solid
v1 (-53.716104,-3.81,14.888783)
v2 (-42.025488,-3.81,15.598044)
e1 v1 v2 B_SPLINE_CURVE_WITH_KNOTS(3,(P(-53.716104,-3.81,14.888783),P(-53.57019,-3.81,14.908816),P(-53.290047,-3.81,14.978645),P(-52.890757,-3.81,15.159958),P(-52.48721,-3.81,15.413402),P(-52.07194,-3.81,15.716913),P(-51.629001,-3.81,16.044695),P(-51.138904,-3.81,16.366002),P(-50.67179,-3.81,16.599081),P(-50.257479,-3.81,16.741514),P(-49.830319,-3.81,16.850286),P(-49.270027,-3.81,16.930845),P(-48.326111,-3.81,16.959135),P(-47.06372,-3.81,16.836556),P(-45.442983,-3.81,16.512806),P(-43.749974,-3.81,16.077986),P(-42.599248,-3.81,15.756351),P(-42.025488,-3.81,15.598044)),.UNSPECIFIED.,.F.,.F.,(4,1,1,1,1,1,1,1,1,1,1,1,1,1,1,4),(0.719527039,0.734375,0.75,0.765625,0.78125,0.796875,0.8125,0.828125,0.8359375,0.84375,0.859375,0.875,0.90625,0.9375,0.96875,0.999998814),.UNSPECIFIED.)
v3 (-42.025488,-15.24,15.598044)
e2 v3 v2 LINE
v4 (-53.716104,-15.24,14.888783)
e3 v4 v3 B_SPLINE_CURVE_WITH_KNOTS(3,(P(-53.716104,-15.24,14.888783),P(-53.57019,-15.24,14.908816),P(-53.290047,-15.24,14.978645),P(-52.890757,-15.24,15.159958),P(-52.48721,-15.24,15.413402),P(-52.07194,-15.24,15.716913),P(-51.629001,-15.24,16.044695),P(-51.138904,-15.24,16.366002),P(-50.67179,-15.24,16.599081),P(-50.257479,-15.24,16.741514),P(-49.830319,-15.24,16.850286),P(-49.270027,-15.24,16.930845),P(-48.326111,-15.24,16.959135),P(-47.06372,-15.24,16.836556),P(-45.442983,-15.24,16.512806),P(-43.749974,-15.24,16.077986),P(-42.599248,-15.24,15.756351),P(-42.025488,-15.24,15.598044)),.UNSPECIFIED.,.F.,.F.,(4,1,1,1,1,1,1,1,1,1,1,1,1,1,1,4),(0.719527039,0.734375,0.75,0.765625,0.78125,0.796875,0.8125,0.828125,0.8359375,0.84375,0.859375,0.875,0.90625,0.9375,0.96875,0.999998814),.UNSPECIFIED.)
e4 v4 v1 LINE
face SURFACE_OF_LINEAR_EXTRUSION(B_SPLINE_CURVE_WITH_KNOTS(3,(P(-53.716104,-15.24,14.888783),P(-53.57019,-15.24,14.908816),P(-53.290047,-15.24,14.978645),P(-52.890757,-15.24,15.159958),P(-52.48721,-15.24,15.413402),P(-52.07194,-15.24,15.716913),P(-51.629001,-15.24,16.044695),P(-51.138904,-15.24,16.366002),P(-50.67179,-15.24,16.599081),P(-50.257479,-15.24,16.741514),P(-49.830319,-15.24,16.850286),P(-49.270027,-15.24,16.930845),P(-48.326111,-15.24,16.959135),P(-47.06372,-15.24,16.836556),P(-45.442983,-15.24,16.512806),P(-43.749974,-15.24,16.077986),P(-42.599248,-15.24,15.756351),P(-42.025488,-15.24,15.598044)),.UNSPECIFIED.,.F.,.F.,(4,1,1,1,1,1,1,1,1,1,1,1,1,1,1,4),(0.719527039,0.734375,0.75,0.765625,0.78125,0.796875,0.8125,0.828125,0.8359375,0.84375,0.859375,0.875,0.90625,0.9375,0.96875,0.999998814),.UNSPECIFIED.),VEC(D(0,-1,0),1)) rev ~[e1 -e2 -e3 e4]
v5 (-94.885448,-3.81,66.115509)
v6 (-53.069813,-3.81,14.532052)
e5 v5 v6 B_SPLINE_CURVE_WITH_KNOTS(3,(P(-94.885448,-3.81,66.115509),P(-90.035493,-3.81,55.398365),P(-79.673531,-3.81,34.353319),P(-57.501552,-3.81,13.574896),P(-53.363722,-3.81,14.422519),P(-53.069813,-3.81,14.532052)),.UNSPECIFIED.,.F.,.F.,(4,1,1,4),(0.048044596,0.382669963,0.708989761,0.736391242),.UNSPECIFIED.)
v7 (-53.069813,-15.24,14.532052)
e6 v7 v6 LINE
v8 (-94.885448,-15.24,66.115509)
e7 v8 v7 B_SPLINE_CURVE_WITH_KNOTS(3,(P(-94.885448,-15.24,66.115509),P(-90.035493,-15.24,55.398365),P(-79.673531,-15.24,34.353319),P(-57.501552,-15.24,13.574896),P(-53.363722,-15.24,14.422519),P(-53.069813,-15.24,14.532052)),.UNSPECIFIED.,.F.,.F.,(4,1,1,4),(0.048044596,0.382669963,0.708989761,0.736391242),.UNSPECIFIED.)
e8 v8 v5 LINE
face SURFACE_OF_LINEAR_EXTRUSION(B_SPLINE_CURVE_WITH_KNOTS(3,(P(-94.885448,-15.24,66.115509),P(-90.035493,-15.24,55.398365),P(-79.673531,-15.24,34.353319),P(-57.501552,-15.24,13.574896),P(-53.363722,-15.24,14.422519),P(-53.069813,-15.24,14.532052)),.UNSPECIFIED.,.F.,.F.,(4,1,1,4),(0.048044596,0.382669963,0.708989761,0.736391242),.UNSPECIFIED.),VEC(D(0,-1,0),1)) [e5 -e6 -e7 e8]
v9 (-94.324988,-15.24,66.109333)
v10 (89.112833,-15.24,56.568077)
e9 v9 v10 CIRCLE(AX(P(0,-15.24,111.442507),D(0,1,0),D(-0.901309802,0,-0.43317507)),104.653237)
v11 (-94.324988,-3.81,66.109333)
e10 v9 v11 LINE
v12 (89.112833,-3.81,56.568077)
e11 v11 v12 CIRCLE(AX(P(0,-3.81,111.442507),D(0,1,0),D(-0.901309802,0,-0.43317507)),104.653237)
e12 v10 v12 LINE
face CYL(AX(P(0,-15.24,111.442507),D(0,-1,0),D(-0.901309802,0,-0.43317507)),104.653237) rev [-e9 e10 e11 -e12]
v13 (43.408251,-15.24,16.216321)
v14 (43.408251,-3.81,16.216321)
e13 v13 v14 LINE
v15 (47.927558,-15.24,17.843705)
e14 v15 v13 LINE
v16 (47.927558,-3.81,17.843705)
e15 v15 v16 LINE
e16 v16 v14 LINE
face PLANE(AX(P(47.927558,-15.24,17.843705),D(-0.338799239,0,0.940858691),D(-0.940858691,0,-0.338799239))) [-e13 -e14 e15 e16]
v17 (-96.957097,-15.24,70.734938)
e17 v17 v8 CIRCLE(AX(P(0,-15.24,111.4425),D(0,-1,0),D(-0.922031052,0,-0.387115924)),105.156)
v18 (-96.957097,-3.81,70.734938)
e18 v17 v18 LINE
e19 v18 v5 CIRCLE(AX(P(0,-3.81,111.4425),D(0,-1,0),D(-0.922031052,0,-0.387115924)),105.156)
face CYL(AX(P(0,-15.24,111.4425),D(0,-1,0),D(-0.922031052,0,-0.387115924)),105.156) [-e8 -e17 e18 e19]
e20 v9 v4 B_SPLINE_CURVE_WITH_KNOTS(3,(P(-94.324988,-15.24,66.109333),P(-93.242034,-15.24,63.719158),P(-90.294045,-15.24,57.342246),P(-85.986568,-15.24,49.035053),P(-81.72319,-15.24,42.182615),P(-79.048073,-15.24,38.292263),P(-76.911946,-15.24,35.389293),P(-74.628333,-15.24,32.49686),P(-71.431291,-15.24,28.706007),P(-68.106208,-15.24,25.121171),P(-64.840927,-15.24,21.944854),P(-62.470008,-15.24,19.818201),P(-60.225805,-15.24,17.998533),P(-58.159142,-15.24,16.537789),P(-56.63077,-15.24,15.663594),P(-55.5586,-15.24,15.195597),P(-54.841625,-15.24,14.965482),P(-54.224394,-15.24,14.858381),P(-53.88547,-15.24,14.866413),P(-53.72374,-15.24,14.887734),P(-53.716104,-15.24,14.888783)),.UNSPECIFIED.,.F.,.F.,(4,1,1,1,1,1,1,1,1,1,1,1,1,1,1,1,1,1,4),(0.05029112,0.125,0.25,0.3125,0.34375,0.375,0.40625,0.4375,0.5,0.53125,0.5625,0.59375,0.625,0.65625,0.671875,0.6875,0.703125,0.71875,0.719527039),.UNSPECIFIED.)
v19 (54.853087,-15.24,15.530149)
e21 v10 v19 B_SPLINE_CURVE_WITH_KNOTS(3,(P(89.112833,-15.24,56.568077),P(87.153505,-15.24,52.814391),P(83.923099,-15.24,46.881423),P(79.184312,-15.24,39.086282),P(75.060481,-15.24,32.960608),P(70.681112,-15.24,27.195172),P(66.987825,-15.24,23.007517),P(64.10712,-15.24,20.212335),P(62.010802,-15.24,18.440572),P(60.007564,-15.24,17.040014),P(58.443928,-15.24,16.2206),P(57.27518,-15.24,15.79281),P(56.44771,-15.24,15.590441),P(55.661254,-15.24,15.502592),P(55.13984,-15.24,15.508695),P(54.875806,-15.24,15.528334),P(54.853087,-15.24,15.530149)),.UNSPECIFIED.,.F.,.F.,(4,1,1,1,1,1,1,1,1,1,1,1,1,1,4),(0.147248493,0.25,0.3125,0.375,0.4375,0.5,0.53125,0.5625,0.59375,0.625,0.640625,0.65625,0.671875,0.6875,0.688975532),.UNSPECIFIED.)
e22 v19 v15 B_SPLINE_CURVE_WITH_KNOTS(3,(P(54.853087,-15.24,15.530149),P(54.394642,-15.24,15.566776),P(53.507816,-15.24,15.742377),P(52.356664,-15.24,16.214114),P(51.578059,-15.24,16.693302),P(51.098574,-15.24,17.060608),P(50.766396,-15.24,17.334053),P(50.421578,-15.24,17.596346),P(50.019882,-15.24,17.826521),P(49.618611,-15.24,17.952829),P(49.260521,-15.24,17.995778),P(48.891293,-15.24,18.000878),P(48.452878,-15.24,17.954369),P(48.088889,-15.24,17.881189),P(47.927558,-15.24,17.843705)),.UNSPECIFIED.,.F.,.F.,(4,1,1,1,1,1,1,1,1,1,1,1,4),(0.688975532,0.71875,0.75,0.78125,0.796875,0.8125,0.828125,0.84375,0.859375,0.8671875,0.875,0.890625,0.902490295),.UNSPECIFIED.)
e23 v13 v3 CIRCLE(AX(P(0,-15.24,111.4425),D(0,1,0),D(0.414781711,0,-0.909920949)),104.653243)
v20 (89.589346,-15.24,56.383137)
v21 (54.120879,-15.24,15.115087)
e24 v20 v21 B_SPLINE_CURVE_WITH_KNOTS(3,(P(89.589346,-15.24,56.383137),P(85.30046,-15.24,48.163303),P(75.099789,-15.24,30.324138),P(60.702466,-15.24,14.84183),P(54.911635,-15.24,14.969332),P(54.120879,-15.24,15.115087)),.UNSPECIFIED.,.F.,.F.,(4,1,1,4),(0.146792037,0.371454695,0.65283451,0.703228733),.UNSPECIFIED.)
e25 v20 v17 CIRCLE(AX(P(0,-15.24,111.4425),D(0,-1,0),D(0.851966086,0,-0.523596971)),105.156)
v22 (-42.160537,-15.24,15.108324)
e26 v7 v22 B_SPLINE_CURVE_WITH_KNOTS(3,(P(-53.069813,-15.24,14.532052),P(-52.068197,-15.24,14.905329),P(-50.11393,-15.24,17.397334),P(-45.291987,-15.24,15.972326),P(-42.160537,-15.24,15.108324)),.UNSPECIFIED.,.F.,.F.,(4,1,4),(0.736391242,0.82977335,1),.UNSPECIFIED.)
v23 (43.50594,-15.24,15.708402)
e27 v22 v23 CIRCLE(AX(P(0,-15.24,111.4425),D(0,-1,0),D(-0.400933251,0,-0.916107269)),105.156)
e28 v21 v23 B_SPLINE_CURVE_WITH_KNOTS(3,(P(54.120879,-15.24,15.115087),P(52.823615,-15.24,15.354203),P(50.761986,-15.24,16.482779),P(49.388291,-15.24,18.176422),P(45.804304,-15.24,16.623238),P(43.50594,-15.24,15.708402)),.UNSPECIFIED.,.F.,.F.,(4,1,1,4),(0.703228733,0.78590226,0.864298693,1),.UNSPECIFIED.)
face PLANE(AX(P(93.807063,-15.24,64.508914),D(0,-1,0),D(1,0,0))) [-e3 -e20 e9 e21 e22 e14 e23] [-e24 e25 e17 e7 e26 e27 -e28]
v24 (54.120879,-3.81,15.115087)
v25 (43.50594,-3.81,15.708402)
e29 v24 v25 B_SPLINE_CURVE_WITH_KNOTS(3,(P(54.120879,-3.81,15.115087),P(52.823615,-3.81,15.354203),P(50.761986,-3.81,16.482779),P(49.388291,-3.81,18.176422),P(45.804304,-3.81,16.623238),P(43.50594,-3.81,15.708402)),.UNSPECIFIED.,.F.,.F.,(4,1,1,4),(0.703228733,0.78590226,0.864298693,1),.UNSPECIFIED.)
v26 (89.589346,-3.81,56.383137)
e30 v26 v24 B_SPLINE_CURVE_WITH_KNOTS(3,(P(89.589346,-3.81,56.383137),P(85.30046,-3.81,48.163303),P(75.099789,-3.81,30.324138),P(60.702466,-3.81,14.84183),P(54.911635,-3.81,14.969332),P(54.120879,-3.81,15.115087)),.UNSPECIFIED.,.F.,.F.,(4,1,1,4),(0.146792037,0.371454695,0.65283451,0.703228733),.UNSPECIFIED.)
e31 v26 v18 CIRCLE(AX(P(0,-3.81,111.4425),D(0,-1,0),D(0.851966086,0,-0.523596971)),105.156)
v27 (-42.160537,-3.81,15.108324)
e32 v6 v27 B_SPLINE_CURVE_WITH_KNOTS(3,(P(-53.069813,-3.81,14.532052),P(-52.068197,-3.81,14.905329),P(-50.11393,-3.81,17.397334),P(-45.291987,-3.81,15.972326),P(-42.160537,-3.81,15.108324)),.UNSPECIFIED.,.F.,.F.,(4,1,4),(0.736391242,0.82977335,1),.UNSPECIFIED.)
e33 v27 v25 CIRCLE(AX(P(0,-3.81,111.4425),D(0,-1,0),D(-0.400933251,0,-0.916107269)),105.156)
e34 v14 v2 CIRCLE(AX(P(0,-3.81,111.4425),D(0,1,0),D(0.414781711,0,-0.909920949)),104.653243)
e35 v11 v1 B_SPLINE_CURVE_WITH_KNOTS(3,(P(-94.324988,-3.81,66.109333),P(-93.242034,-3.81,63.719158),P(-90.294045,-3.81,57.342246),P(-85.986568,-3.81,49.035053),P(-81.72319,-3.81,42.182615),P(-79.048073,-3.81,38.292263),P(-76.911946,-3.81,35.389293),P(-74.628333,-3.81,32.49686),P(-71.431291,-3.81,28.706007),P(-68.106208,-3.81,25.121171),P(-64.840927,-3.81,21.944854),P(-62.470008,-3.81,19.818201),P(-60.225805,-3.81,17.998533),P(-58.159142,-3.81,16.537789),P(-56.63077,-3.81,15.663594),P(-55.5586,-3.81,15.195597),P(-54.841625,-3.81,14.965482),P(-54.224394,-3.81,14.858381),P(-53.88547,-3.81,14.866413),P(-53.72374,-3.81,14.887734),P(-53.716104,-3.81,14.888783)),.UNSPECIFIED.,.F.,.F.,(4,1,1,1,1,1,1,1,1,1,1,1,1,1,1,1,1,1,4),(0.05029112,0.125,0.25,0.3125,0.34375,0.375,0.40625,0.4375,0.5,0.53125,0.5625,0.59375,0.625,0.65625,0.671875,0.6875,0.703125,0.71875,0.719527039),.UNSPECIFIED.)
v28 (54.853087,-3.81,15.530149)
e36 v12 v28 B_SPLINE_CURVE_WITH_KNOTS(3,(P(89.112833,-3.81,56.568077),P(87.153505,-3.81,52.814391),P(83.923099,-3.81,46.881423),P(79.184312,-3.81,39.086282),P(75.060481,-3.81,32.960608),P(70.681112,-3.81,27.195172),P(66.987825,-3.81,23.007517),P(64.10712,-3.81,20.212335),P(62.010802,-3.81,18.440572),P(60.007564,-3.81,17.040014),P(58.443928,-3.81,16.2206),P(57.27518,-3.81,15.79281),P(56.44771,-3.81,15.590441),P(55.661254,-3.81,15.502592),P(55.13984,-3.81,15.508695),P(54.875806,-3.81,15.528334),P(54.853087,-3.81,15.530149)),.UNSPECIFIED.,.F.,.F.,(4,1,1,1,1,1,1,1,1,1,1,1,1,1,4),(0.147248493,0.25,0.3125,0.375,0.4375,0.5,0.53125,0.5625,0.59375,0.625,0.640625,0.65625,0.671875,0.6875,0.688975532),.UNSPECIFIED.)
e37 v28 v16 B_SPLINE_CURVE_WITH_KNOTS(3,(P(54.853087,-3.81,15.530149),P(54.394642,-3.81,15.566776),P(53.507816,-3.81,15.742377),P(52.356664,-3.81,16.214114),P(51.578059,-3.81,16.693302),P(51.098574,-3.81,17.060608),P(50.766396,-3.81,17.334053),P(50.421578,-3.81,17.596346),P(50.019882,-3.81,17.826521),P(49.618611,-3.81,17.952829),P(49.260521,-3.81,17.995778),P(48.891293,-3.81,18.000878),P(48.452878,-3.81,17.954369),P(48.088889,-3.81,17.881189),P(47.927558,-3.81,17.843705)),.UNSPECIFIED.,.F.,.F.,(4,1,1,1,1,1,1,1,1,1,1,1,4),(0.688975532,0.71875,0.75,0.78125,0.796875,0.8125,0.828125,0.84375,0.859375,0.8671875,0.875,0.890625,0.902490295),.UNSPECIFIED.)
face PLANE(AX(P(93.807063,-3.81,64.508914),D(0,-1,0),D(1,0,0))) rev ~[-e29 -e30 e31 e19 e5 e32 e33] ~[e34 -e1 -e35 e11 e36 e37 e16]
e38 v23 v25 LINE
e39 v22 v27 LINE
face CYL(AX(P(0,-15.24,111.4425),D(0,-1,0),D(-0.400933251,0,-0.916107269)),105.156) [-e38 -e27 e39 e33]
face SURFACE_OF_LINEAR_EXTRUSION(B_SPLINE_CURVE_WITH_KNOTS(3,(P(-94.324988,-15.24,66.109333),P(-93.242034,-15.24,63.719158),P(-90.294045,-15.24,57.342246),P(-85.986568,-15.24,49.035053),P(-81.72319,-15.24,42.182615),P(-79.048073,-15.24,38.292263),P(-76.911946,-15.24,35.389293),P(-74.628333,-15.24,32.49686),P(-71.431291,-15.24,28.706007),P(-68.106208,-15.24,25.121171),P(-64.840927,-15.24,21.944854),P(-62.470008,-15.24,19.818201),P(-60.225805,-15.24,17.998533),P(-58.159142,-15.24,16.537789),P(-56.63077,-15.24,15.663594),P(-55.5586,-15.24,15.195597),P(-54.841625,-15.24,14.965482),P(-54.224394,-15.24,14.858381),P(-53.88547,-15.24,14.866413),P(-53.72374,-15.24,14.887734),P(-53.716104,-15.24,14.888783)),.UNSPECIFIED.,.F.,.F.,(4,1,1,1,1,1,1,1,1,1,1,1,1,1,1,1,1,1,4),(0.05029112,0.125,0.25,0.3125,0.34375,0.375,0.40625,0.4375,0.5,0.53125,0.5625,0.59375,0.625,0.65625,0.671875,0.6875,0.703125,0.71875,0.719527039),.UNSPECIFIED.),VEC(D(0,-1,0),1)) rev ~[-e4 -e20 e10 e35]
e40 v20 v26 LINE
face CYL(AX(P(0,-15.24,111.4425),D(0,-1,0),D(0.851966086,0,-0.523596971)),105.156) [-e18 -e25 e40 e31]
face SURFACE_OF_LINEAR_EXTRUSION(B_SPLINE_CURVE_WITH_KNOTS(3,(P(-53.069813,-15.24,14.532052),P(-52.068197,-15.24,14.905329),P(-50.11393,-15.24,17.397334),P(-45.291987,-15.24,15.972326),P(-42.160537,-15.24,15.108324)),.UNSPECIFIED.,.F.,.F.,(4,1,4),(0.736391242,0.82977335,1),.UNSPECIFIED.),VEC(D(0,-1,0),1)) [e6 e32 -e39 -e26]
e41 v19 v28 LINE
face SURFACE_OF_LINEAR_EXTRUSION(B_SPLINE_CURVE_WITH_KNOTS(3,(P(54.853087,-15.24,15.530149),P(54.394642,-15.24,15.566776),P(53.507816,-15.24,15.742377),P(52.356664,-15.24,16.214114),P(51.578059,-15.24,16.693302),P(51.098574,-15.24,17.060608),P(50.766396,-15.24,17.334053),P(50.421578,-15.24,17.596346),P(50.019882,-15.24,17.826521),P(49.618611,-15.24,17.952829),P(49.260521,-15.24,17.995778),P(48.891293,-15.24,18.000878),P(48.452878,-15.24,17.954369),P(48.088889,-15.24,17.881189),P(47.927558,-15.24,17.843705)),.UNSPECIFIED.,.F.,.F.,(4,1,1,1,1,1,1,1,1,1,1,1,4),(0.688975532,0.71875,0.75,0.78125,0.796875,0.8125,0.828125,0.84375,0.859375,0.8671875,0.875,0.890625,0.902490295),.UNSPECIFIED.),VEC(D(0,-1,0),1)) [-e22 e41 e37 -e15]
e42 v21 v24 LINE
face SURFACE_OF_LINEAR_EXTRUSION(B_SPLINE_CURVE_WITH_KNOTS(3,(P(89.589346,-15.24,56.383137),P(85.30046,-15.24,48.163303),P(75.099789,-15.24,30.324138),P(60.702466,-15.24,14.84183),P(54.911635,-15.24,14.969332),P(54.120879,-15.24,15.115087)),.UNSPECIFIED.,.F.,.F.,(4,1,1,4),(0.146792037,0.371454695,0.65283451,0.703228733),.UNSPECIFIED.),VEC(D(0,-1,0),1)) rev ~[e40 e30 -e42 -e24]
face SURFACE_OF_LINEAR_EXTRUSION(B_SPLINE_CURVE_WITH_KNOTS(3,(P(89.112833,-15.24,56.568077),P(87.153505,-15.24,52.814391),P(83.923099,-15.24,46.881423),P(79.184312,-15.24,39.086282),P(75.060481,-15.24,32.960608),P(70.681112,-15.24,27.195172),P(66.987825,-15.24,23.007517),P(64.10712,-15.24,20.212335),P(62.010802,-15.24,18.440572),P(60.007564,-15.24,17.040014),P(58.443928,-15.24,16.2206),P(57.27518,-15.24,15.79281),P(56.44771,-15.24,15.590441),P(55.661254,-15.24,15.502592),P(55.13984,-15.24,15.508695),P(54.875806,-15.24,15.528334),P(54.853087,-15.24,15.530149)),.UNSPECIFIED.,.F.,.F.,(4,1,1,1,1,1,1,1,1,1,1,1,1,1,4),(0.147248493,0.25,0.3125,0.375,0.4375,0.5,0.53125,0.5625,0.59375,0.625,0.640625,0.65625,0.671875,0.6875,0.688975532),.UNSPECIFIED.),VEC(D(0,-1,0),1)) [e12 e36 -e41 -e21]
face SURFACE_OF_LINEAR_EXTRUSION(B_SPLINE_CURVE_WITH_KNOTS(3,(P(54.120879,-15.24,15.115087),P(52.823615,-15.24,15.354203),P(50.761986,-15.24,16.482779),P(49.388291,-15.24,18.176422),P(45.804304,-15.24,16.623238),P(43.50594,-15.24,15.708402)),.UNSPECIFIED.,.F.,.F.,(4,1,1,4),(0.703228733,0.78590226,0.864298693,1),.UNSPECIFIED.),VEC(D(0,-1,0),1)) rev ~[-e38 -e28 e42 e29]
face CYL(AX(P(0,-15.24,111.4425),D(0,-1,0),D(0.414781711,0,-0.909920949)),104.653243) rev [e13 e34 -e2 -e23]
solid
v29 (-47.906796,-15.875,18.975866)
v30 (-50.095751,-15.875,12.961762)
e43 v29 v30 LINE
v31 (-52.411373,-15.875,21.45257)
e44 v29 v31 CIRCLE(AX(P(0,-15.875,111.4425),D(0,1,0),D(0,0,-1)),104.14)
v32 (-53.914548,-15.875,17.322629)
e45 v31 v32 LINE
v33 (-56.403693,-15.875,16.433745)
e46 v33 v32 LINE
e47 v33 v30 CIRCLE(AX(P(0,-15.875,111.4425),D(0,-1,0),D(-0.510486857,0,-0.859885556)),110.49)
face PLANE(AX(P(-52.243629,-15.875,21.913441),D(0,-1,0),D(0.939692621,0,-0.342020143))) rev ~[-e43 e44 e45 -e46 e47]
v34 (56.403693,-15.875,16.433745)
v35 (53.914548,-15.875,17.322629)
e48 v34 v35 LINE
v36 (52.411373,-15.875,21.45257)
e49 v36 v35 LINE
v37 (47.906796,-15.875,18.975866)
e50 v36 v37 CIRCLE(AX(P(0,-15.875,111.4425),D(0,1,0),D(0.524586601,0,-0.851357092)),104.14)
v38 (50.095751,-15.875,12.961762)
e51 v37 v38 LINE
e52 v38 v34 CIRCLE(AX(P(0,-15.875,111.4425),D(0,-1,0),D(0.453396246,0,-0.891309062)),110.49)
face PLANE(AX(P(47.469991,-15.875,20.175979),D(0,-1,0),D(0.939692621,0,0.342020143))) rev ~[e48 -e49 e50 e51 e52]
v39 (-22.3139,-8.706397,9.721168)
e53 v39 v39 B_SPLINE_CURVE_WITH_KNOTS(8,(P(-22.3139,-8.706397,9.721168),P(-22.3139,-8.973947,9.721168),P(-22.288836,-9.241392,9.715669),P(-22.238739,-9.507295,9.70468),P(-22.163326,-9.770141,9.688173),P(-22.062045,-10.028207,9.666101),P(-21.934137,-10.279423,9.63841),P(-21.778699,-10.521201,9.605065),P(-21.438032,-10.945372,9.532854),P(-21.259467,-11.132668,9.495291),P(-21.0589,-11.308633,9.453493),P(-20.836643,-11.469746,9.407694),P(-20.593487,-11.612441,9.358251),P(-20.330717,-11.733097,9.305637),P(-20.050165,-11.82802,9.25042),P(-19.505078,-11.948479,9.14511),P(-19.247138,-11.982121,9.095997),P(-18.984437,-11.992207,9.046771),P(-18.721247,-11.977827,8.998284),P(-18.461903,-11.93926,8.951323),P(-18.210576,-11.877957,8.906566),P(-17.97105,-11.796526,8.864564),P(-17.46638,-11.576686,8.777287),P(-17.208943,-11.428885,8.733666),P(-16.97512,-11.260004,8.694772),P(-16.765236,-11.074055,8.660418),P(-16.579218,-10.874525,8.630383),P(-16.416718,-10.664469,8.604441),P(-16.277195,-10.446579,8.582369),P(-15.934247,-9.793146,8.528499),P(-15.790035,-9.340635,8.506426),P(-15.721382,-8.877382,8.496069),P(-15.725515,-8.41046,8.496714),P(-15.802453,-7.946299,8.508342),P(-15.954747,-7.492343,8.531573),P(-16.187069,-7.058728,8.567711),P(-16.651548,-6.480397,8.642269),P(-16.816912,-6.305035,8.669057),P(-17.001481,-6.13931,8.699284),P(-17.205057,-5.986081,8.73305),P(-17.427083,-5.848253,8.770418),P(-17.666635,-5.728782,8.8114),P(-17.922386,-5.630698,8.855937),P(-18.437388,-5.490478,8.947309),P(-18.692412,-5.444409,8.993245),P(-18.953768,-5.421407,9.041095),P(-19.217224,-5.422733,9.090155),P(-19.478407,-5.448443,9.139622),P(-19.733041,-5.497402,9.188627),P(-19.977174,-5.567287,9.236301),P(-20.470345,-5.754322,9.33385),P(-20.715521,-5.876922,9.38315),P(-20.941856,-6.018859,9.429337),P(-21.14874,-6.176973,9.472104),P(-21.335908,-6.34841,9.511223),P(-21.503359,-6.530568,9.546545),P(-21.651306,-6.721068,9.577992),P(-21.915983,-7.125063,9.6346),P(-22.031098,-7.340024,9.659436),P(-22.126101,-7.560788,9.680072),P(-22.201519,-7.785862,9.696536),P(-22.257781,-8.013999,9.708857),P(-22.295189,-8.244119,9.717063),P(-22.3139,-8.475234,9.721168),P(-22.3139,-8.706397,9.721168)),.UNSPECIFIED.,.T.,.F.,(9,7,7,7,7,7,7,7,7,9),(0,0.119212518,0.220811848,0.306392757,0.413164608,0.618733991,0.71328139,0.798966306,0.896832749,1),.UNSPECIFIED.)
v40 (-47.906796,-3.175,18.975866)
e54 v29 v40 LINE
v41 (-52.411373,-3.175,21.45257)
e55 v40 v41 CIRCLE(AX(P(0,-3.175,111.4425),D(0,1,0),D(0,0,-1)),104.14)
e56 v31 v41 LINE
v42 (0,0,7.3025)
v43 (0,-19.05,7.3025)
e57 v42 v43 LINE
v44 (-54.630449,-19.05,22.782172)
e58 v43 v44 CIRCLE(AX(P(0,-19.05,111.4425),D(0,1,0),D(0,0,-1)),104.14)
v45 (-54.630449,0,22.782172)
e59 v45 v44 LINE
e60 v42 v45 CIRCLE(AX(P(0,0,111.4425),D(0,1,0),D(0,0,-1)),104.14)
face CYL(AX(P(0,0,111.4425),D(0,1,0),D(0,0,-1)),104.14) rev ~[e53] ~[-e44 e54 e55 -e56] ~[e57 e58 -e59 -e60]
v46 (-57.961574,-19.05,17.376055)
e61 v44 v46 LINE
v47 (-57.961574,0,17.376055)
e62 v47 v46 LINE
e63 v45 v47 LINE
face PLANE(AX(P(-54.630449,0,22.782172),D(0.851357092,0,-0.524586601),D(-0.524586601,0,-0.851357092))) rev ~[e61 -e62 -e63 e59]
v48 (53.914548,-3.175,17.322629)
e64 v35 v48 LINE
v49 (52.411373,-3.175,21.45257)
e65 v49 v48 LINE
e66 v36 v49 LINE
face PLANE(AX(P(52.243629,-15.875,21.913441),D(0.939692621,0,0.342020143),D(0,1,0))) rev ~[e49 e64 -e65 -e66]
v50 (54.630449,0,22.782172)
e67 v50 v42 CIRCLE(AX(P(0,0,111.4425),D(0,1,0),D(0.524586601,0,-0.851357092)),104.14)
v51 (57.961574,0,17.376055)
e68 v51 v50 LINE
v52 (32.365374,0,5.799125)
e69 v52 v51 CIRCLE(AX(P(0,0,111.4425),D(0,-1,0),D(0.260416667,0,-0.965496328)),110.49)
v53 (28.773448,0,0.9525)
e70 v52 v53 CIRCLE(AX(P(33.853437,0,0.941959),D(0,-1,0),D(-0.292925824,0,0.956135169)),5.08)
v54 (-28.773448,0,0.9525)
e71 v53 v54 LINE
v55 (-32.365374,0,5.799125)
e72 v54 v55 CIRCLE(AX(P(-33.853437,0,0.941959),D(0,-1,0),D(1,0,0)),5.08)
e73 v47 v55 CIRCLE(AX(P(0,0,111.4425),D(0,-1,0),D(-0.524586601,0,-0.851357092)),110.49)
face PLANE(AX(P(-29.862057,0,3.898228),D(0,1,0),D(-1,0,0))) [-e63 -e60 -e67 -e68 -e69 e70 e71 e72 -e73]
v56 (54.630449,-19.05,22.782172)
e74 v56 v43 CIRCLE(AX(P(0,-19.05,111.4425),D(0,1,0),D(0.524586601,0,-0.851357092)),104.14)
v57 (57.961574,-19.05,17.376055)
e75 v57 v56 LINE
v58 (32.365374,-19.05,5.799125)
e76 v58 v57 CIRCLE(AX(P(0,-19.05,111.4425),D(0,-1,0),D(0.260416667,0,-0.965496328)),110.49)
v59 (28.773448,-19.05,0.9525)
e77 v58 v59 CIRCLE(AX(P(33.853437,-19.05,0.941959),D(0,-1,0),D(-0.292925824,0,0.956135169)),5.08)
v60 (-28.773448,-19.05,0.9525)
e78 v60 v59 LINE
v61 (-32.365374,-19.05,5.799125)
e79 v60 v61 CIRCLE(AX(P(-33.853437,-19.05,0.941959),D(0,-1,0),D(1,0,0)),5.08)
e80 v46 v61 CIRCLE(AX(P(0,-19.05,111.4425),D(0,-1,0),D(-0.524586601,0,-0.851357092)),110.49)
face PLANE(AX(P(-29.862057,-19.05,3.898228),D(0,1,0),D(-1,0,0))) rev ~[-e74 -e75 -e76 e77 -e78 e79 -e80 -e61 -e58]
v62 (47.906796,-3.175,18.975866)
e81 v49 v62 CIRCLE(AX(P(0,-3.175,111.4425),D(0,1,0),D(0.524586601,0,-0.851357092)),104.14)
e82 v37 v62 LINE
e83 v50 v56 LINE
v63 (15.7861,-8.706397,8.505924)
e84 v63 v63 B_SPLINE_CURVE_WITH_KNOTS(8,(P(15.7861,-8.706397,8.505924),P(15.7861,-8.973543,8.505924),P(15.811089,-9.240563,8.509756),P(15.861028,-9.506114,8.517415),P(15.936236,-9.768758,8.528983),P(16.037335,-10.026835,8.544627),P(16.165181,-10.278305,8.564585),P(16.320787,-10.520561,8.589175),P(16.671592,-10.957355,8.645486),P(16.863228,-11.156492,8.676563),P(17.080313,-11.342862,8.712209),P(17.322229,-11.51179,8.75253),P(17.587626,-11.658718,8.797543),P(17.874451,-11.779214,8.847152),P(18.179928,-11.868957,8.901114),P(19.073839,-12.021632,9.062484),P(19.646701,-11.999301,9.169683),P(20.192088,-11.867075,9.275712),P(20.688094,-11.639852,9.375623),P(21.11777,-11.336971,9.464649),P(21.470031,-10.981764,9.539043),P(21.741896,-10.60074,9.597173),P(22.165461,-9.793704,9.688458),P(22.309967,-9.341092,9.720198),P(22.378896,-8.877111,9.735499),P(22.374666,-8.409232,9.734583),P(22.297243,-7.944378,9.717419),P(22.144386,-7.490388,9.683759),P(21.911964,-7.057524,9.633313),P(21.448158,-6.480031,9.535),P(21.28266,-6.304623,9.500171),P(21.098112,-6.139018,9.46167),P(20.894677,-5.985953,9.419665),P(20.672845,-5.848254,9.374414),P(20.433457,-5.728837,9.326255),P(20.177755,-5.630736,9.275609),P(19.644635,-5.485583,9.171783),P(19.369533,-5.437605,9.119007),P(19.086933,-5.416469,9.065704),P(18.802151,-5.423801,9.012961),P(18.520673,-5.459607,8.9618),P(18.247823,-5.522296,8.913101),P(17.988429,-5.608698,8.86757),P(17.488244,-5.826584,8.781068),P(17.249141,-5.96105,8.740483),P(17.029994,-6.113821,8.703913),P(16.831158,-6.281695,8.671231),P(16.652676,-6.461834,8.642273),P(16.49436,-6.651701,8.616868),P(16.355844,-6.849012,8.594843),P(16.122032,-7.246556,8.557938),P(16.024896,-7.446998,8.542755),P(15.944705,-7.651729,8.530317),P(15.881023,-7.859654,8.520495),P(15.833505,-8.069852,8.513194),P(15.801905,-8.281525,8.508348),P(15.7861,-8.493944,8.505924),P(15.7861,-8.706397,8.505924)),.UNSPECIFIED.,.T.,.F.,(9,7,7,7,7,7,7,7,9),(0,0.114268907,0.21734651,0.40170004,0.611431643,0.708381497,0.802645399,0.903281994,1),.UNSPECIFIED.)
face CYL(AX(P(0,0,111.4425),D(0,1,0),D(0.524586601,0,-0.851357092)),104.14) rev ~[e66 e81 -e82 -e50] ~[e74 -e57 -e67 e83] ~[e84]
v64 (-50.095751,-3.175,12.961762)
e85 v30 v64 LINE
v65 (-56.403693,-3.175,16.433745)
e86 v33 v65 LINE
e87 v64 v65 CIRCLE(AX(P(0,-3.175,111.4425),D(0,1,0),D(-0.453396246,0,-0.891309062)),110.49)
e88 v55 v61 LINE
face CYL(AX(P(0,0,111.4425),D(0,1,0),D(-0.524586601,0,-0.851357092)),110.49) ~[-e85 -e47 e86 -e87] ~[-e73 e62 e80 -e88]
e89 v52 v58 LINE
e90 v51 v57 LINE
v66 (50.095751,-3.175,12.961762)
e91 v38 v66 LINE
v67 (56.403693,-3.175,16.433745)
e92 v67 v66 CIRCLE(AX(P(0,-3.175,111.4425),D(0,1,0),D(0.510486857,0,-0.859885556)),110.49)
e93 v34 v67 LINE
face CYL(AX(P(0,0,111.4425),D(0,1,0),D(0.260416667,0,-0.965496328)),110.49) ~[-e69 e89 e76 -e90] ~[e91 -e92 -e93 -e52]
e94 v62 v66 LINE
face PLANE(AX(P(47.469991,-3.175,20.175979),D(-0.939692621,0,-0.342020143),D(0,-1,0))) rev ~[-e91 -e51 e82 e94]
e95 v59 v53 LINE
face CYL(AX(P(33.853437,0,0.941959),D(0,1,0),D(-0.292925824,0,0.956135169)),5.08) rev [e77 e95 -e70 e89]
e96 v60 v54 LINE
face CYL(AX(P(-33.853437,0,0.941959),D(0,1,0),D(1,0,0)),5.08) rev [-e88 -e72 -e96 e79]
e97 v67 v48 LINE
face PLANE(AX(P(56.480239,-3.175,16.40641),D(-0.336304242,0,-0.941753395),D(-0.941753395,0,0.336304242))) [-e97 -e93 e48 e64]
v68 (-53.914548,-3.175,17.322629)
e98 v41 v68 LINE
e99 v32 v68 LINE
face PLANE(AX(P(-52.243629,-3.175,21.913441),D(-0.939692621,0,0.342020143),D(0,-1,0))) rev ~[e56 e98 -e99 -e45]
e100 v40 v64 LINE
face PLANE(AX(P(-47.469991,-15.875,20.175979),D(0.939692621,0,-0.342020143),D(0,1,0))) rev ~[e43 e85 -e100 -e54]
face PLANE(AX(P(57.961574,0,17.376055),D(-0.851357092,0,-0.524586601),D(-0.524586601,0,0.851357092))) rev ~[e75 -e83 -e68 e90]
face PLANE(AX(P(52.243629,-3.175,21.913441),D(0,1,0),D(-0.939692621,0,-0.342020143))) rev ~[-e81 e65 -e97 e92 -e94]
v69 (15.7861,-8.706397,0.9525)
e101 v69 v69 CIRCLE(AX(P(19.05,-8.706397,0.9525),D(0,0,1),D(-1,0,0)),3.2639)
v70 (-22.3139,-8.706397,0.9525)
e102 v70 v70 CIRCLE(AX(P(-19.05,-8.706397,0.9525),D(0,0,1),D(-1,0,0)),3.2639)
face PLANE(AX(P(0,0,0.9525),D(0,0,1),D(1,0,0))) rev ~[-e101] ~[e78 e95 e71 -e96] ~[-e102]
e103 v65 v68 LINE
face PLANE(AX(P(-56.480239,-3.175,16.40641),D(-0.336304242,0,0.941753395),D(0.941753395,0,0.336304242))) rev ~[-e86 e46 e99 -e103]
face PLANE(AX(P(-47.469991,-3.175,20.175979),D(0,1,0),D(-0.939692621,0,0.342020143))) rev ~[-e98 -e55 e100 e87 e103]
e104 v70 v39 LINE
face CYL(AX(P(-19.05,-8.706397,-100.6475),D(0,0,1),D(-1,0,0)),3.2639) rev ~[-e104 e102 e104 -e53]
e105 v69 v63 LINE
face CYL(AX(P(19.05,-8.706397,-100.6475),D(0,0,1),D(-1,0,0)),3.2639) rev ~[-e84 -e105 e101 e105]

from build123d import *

# Parameters (mm, degrees)
F1_DEPTH     = 19.05
F3_D         = 6.5278
F3_DEPTH     = 101.6
F3_TIP       = 1.9611489744
F7_DEPTH     = 25.4
F9_DEPTH     = 25.4
F10_T1_DEPTH = 12.7
F11_T4_DEPTH = 19.05
F11_T9_DEPTH = 19.05
F13_START    = -3.81
F13_DEPTH    = 11.43


# Not quite as in the source:
# - a fillet or chamfer that OpenCascade refuses, or shapes differently, is made with other operations: its cross-section is extruded or revolved along the edge and cut away or added
# - ends of sketch curves that miss each other by under 0.0002 mm in the source are joined
# - the dataset's text gives a spline's control points without its knots; the knots are read off the source's solid


with BuildPart() as f1:
    # F0 (on Front) → F1 (new body)
    with BuildSketch(Plane.XZ):
        with BuildLine():
            Line((0, 0.9525), (28.7734375, 0.9525))
            Line((28.7734375, 0.9525), (28.7734375, 4.7648106998))
            ThreePointArc((28.7734375, 4.7648106998), (43.8235256978, 10.0149953703), (57.9615735284, 17.3760548981))
            Line((57.9615735284, 17.3760548981), (54.630448613, 22.7821724327))
            ThreePointArc((54.630448613, 22.7821724327), (28.390606608, 11.2471255737), (0, 7.3025))
            ThreePointArc((0, 7.3025), (-28.390606608, 11.2471255737), (-54.630448613, 22.7821724327))
            Line((-54.630448613, 22.7821724327), (-57.9615735284, 17.3760548981))
            ThreePointArc((-57.9615735284, 17.3760548981), (-43.8235256978, 10.0149953703), (-28.7734375, 4.7648106998))
            Line((-28.7734375, 4.7648106998), (-28.7734375, 0.9525))
            Line((-28.7734375, 0.9525), (0, 0.9525))
        make_face()
    extrude(amount=F1_DEPTH)

    # F3
    with Locations(Plane(origin=(0, 0, 0.9525), x_dir=(1, 0, 0), z_dir=(0, 0, -1))):
        with Locations((-19.05, 8.706397377), (19.05, 8.706397377)):
            Hole(F3_D / 2, depth=F3_DEPTH)
            with Locations((0, 0, -(F3_DEPTH + F3_TIP / 2))):  # 118° drill point
                Cone(0, F3_D / 2, F3_TIP, mode=Mode.SUBTRACT)

    # F6 (on face) → F7 (cut)
    with BuildSketch(Plane(origin=(0.9315005668, 0, 2.5592767734), x_dir=(0.9396926208, 0, -0.3420201433), z_dir=(0.3420201433, 0, 0.9396926208))):
        Polygon((-56.5877913126, -15.875), (-51.5077913126, -15.875), (-51.5077913126, -3.175), (-56.5877913126, -3.175), (-56.5877913126, -9.525), align=None)
    extrude(amount=-F7_DEPTH, mode=Mode.SUBTRACT)

    # F8 (on face) → F9 (cut)
    with BuildSketch(Plane(origin=(-0.9315005668, 0, 2.5592767734), x_dir=(0.9396926208, 0, 0.3420201433), z_dir=(-0.3420201433, 0, 0.9396926208))):
        Polygon((56.5877913126, -9.525), (56.5877913126, -3.175), (51.5077913126, -3.175), (51.5077913126, -15.875), (56.5877913126, -15.875), align=None)
    extrude(amount=-F9_DEPTH, mode=Mode.SUBTRACT)

    # F10: chamfer of 2.032 on 2 edges, made by hand

    # F10_s2 → F10_t1 (cut)
    with BuildSketch(Plane.XZ.offset(3.175)):
        with BuildLine():
            Line((-56.4802385277, 16.4064101357), (-53.8380025429, 17.3499641227))
            Line((-53.8380025429, 17.3499641227), (-53.7998134348, 17.3360644241))
            ThreePointArc((-53.7998134348, 17.3360644241), (-54.2182847726, 16.36929669), (-54.5779497805, 15.3811252023))
            Line((-54.5779497805, 15.3811252023), (-54.6362275834, 15.359697094))
            ThreePointArc((-54.6362275834, 15.359697094), (-55.5554397743, 15.8882458284), (-56.5009847135, 16.3714643867))
            Line((-56.5009847135, 16.3714643867), (-56.4802385277, 16.4064101357))
        make_face()
        with BuildLine():
            Line((56.4802385277, 16.4064101357), (53.8380025429, 17.3499641227))
            Line((53.8380025429, 17.3499641227), (53.7998134348, 17.3360644241))
            ThreePointArc((53.7998134348, 17.3360644241), (54.2182847726, 16.36929669), (54.5779497805, 15.3811252023))
            Line((54.5779497805, 15.3811252023), (54.6362275834, 15.359697094))
            ThreePointArc((54.6362275834, 15.359697094), (55.5554397743, 15.8882458284), (56.5009847135, 16.3714643867))
            Line((56.5009847135, 16.3714643867), (56.4802385277, 16.4064101357))
        make_face()
    extrude(amount=F10_T1_DEPTH, mode=Mode.SUBTRACT)

    # F11: fillet of radius 5.08 on 2 edges, made by hand


with BuildPart() as f11_tool2:
    # F11_s3 → F11_t4 (new body)
    with BuildSketch(Plane.XZ):
        with BuildLine():
            ThreePointArc((32.3653743132, 5.7991251695), (29.7689692978, 3.9624749409), (28.7734375, 0.9419585107))
            Line((28.7734375, 0.9419585107), (28.7734375, 4.7648106998))
            ThreePointArc((28.7734375, 4.7648106998), (30.5737800916, 5.266777394), (32.3653743132, 5.7991251695))
        make_face()
    extrude(amount=F11_T4_DEPTH)

    split(bisect_by=Plane.XY.offset(0.9525), keep=Keep.TOP)


with BuildPart() as f1_1:
    add(f1.part)

    # F11_t1: union F11_tool2
    add(f11_tool2.part)


with BuildPart() as f11_tool7:
    # F11_s8 → F11_t9 (new body)
    with BuildSketch(Plane.XZ):
        with BuildLine():
            ThreePointArc((-28.7734375, 0.9419585107), (-29.7689692978, 3.9624749409), (-32.3653743132, 5.7991251695))
            ThreePointArc((-32.3653743132, 5.7991251695), (-30.5737800916, 5.266777394), (-28.7734375, 4.7648106998))
            Line((-28.7734375, 4.7648106998), (-28.7734375, 0.9419585107))
        make_face()
    extrude(amount=F11_T9_DEPTH)

    split(bisect_by=Plane.XY.offset(0.9525), keep=Keep.TOP)


with BuildPart() as f1_2:
    add(f1_1.part)

    # F11_t6: union F11_tool7
    add(f11_tool7.part)


with BuildPart() as f13:
    # F12 (on face) → F13 (new body)
    with BuildSketch(Plane.XZ.offset(19.05).offset(F13_START)):
        with BuildLine():
            add(Edge.make_bspline(
                [(97.7812934658, 72.7565466816), (95.0915874954, 67.2526865805), (92.3916550741, 61.7538834708), (89.5893457762, 56.3831369507)],
                knots=[0, 0, 0, 0, 0.1467920374, 0.1467920374, 0.1467920374, 0.1467920374], degree=3))
            ThreePointArc((89.5893457762, 56.3831369507), (94.042337535, 64.3912185408), (97.7812934658, 72.7565466816))
        make_face()
        with BuildLine():
            add(Edge.make_bspline(
                [(89.112833025, 56.5680768855), (87.1535051538, 52.8143908139), (83.9230985786, 46.8814228282), (79.1843120961, 39.086281514), (75.0604811368, 32.9606078689), (70.6811123978, 27.195171834), (66.9878253233, 23.0075171537), (64.107119758, 20.212335288), (62.0108024209, 18.440572074), (60.0075643358, 17.04001445), (58.4439275603, 16.2205997367), (57.2751800485, 15.792809978), (56.447710407, 15.5904406243), (55.6612536188, 15.5025921765), (55.1398399584, 15.5086945326), (54.8758058385, 15.5283343935), (54.8530867048, 15.5301494973)],
                knots=[0.1472484928, 0.1472484928, 0.1472484928, 0.1472484928, 0.25, 0.3125, 0.375, 0.4375, 0.5, 0.53125, 0.5625, 0.59375, 0.625, 0.640625, 0.65625, 0.671875, 0.6875, 0.6889755322, 0.6889755322, 0.6889755322, 0.6889755322], degree=3))
            ThreePointArc((54.8530867048, 15.5301494973), (54.4873779941, 15.3219208334), (54.1208788351, 15.1150865908))
            add(Edge.make_bspline(
                [(89.5893457762, 56.3831369507), (85.3004601923, 48.1633029224), (75.0997889772, 30.3241377329), (60.7024662065, 14.841829536), (54.9116352389, 14.9693315987), (54.1208788351, 15.1150865908)],
                knots=[0.1467920374, 0.1467920374, 0.1467920374, 0.1467920374, 0.3714546946, 0.6528345101, 0.7032287333, 0.7032287333, 0.7032287333, 0.7032287333], degree=3))
            add(Edge.make_bspline(
                [(97.7812934658, 72.7565466816), (95.0915874954, 67.2526865805), (92.3916550741, 61.7538834708), (89.5893457762, 56.3831369507)],
                knots=[0, 0, 0, 0, 0.1467920374, 0.1467920374, 0.1467920374, 0.1467920374], degree=3))
            ThreePointArc((97.7812934658, 72.7565466816), (-1.0915815894, 216.5928342155), (-96.9570973239, 70.7349378707))
            add(Edge.make_bspline(
                [(-96.9570973239, 70.7349378707), (-96.2699684757, 69.1942721991), (-95.5817912633, 67.6542476227), (-94.885448022, 66.1155092588)],
                knots=[0, 0, 0, 0, 0.0480445963, 0.0480445963, 0.0480445963, 0.0480445963], degree=3))
            add(Edge.make_bspline(
                [(-94.885448022, 66.1155092588), (-90.0354933898, 55.3983645898), (-79.6735313167, 34.3533190654), (-57.5015516811, 13.5748962232), (-53.363721711, 14.4225193998), (-53.0698134343, 14.5320516363)],
                knots=[0.0480445963, 0.0480445963, 0.0480445963, 0.0480445963, 0.3826699627, 0.7089897606, 0.736391242, 0.736391242, 0.736391242, 0.736391242], degree=3))
            ThreePointArc((-53.0698134343, 14.5320516363), (-53.393256487, 14.7098774691), (-53.7161036897, 14.8887828038))
            add(Edge.make_bspline(
                [(-94.3249878412, 66.1093333744), (-93.2420344254, 63.7191576967), (-90.2940452977, 57.3422461891), (-85.9865677113, 49.0350531394), (-81.7231896657, 42.182614942), (-79.0480730962, 38.2922627791), (-76.9119458126, 35.3892927255), (-74.6283332446, 32.4968598043), (-71.4312912207, 28.7060070403), (-68.1062078289, 25.1211706689), (-64.8409274917, 21.9448539228), (-62.4700075431, 19.8182013503), (-60.2258045547, 17.9985331885), (-58.1591419069, 16.5377888749), (-56.6307697244, 15.663594476), (-55.5586001999, 15.1955970793), (-54.841625032, 14.9654820035), (-54.2243938183, 14.8583814899), (-53.8854699098, 14.8664131973), (-53.7237397991, 14.8877344036), (-53.7161036897, 14.8887828038)],
                knots=[0.0502911195, 0.0502911195, 0.0502911195, 0.0502911195, 0.125, 0.25, 0.3125, 0.34375, 0.375, 0.40625, 0.4375, 0.5, 0.53125, 0.5625, 0.59375, 0.625, 0.65625, 0.671875, 0.6875, 0.703125, 0.71875, 0.7195270393, 0.7195270393, 0.7195270393, 0.7195270393], degree=3))
            ThreePointArc((-94.3249878412, 66.1093333744), (5.4360404927, 215.9544649915), (89.112833025, 56.5680768855))
        make_face()
        with BuildLine():
            ThreePointArc((-96.9570973239, 70.7349378707), (-95.9490767615, 68.4127544207), (-94.885448022, 66.1155092588))
            add(Edge.make_bspline(
                [(-96.9570973239, 70.7349378707), (-96.2699684757, 69.1942721991), (-95.5817912633, 67.6542476227), (-94.885448022, 66.1155092588)],
                knots=[0, 0, 0, 0, 0.0480445963, 0.0480445963, 0.0480445963, 0.0480445963], degree=3))
        make_face()
        with BuildLine():
            ThreePointArc((54.1208788351, 15.1150865908), (54.4873779941, 15.3219208334), (54.8530867048, 15.5301494973))
            add(Edge.make_bspline(
                [(54.8530867048, 15.5301494973), (54.3946418593, 15.5667761121), (53.5078157419, 15.7423770413), (52.3566642919, 16.2141141425), (51.5780585738, 16.6933019848), (51.0985736249, 17.0606084253), (50.7663963395, 17.3340534027), (50.4215776233, 17.5963458323), (50.0198819854, 17.826521233), (49.6186110553, 17.9528293594), (49.2605213762, 17.995778311), (48.8912925087, 18.0008783124), (48.4528779364, 17.9543693016), (48.0888893332, 17.8811888286), (47.9275578829, 17.843704654)],
                knots=[0.6889755322, 0.6889755322, 0.6889755322, 0.6889755322, 0.71875, 0.75, 0.78125, 0.796875, 0.8125, 0.828125, 0.84375, 0.859375, 0.8671875, 0.875, 0.890625, 0.9024902953, 0.9024902953, 0.9024902953, 0.9024902953], degree=3))
            Line((47.9275578829, 17.843704654), (43.408251327, 16.2163214599))
            ThreePointArc((43.408251327, 16.2163214599), (0.7573475236, 6.7919969561), (-42.025488057, 15.5980441552))
            add(Edge.make_bspline(
                [(-53.7161036897, 14.8887828038), (-53.5701900202, 14.9088160324), (-53.2900470116, 14.978644905), (-52.8907566688, 15.1599576115), (-52.4872099402, 15.4134020086), (-52.0719397585, 15.7169129221), (-51.6290014012, 16.0446951453), (-51.1389043543, 16.3660024589), (-50.6717898209, 16.5990811154), (-50.2574791706, 16.7415137761), (-49.8303192702, 16.8502861072), (-49.2700265762, 16.9308447204), (-48.3261113032, 16.9591345215), (-47.0637204526, 16.8365561474), (-45.4429828571, 16.5128060575), (-43.7499737798, 16.0779855487), (-42.5992478875, 15.7563509731), (-42.025488057, 15.5980441552)],
                knots=[0.7195270393, 0.7195270393, 0.7195270393, 0.7195270393, 0.734375, 0.75, 0.765625, 0.78125, 0.796875, 0.8125, 0.828125, 0.8359375, 0.84375, 0.859375, 0.875, 0.90625, 0.9375, 0.96875, 0.9999988144, 0.9999988144, 0.9999988144, 0.9999988144], degree=3))
            ThreePointArc((-53.7161036897, 14.8887828038), (-53.393256487, 14.7098774691), (-53.0698134343, 14.5320516363))
            add(Edge.make_bspline(
                [(-53.0698134343, 14.5320516363), (-52.0681969868, 14.905328942), (-50.1139300611, 17.3973337636), (-45.2919867438, 15.9723255411), (-42.1605369582, 15.1083240322)],
                knots=[0.736391242, 0.736391242, 0.736391242, 0.736391242, 0.82977335, 1, 1, 1, 1], degree=3))
            ThreePointArc((-42.1605369582, 15.1083240322), (0.7365801988, 6.2890797722), (43.5059395829, 15.7084018061))
            add(Edge.make_bspline(
                [(54.1208788351, 15.1150865908), (52.8236146579, 15.354202871), (50.7619859651, 16.4827791328), (49.3882914075, 18.1764224999), (45.8043035123, 16.6232383684), (43.5059395829, 15.7084018061)],
                knots=[0.7032287333, 0.7032287333, 0.7032287333, 0.7032287333, 0.7859022599, 0.8642986928, 1, 1, 1, 1], degree=3))
        make_face()
    extrude(amount=-F13_DEPTH)


solid = Compound([f1_2.part, f13.part])
